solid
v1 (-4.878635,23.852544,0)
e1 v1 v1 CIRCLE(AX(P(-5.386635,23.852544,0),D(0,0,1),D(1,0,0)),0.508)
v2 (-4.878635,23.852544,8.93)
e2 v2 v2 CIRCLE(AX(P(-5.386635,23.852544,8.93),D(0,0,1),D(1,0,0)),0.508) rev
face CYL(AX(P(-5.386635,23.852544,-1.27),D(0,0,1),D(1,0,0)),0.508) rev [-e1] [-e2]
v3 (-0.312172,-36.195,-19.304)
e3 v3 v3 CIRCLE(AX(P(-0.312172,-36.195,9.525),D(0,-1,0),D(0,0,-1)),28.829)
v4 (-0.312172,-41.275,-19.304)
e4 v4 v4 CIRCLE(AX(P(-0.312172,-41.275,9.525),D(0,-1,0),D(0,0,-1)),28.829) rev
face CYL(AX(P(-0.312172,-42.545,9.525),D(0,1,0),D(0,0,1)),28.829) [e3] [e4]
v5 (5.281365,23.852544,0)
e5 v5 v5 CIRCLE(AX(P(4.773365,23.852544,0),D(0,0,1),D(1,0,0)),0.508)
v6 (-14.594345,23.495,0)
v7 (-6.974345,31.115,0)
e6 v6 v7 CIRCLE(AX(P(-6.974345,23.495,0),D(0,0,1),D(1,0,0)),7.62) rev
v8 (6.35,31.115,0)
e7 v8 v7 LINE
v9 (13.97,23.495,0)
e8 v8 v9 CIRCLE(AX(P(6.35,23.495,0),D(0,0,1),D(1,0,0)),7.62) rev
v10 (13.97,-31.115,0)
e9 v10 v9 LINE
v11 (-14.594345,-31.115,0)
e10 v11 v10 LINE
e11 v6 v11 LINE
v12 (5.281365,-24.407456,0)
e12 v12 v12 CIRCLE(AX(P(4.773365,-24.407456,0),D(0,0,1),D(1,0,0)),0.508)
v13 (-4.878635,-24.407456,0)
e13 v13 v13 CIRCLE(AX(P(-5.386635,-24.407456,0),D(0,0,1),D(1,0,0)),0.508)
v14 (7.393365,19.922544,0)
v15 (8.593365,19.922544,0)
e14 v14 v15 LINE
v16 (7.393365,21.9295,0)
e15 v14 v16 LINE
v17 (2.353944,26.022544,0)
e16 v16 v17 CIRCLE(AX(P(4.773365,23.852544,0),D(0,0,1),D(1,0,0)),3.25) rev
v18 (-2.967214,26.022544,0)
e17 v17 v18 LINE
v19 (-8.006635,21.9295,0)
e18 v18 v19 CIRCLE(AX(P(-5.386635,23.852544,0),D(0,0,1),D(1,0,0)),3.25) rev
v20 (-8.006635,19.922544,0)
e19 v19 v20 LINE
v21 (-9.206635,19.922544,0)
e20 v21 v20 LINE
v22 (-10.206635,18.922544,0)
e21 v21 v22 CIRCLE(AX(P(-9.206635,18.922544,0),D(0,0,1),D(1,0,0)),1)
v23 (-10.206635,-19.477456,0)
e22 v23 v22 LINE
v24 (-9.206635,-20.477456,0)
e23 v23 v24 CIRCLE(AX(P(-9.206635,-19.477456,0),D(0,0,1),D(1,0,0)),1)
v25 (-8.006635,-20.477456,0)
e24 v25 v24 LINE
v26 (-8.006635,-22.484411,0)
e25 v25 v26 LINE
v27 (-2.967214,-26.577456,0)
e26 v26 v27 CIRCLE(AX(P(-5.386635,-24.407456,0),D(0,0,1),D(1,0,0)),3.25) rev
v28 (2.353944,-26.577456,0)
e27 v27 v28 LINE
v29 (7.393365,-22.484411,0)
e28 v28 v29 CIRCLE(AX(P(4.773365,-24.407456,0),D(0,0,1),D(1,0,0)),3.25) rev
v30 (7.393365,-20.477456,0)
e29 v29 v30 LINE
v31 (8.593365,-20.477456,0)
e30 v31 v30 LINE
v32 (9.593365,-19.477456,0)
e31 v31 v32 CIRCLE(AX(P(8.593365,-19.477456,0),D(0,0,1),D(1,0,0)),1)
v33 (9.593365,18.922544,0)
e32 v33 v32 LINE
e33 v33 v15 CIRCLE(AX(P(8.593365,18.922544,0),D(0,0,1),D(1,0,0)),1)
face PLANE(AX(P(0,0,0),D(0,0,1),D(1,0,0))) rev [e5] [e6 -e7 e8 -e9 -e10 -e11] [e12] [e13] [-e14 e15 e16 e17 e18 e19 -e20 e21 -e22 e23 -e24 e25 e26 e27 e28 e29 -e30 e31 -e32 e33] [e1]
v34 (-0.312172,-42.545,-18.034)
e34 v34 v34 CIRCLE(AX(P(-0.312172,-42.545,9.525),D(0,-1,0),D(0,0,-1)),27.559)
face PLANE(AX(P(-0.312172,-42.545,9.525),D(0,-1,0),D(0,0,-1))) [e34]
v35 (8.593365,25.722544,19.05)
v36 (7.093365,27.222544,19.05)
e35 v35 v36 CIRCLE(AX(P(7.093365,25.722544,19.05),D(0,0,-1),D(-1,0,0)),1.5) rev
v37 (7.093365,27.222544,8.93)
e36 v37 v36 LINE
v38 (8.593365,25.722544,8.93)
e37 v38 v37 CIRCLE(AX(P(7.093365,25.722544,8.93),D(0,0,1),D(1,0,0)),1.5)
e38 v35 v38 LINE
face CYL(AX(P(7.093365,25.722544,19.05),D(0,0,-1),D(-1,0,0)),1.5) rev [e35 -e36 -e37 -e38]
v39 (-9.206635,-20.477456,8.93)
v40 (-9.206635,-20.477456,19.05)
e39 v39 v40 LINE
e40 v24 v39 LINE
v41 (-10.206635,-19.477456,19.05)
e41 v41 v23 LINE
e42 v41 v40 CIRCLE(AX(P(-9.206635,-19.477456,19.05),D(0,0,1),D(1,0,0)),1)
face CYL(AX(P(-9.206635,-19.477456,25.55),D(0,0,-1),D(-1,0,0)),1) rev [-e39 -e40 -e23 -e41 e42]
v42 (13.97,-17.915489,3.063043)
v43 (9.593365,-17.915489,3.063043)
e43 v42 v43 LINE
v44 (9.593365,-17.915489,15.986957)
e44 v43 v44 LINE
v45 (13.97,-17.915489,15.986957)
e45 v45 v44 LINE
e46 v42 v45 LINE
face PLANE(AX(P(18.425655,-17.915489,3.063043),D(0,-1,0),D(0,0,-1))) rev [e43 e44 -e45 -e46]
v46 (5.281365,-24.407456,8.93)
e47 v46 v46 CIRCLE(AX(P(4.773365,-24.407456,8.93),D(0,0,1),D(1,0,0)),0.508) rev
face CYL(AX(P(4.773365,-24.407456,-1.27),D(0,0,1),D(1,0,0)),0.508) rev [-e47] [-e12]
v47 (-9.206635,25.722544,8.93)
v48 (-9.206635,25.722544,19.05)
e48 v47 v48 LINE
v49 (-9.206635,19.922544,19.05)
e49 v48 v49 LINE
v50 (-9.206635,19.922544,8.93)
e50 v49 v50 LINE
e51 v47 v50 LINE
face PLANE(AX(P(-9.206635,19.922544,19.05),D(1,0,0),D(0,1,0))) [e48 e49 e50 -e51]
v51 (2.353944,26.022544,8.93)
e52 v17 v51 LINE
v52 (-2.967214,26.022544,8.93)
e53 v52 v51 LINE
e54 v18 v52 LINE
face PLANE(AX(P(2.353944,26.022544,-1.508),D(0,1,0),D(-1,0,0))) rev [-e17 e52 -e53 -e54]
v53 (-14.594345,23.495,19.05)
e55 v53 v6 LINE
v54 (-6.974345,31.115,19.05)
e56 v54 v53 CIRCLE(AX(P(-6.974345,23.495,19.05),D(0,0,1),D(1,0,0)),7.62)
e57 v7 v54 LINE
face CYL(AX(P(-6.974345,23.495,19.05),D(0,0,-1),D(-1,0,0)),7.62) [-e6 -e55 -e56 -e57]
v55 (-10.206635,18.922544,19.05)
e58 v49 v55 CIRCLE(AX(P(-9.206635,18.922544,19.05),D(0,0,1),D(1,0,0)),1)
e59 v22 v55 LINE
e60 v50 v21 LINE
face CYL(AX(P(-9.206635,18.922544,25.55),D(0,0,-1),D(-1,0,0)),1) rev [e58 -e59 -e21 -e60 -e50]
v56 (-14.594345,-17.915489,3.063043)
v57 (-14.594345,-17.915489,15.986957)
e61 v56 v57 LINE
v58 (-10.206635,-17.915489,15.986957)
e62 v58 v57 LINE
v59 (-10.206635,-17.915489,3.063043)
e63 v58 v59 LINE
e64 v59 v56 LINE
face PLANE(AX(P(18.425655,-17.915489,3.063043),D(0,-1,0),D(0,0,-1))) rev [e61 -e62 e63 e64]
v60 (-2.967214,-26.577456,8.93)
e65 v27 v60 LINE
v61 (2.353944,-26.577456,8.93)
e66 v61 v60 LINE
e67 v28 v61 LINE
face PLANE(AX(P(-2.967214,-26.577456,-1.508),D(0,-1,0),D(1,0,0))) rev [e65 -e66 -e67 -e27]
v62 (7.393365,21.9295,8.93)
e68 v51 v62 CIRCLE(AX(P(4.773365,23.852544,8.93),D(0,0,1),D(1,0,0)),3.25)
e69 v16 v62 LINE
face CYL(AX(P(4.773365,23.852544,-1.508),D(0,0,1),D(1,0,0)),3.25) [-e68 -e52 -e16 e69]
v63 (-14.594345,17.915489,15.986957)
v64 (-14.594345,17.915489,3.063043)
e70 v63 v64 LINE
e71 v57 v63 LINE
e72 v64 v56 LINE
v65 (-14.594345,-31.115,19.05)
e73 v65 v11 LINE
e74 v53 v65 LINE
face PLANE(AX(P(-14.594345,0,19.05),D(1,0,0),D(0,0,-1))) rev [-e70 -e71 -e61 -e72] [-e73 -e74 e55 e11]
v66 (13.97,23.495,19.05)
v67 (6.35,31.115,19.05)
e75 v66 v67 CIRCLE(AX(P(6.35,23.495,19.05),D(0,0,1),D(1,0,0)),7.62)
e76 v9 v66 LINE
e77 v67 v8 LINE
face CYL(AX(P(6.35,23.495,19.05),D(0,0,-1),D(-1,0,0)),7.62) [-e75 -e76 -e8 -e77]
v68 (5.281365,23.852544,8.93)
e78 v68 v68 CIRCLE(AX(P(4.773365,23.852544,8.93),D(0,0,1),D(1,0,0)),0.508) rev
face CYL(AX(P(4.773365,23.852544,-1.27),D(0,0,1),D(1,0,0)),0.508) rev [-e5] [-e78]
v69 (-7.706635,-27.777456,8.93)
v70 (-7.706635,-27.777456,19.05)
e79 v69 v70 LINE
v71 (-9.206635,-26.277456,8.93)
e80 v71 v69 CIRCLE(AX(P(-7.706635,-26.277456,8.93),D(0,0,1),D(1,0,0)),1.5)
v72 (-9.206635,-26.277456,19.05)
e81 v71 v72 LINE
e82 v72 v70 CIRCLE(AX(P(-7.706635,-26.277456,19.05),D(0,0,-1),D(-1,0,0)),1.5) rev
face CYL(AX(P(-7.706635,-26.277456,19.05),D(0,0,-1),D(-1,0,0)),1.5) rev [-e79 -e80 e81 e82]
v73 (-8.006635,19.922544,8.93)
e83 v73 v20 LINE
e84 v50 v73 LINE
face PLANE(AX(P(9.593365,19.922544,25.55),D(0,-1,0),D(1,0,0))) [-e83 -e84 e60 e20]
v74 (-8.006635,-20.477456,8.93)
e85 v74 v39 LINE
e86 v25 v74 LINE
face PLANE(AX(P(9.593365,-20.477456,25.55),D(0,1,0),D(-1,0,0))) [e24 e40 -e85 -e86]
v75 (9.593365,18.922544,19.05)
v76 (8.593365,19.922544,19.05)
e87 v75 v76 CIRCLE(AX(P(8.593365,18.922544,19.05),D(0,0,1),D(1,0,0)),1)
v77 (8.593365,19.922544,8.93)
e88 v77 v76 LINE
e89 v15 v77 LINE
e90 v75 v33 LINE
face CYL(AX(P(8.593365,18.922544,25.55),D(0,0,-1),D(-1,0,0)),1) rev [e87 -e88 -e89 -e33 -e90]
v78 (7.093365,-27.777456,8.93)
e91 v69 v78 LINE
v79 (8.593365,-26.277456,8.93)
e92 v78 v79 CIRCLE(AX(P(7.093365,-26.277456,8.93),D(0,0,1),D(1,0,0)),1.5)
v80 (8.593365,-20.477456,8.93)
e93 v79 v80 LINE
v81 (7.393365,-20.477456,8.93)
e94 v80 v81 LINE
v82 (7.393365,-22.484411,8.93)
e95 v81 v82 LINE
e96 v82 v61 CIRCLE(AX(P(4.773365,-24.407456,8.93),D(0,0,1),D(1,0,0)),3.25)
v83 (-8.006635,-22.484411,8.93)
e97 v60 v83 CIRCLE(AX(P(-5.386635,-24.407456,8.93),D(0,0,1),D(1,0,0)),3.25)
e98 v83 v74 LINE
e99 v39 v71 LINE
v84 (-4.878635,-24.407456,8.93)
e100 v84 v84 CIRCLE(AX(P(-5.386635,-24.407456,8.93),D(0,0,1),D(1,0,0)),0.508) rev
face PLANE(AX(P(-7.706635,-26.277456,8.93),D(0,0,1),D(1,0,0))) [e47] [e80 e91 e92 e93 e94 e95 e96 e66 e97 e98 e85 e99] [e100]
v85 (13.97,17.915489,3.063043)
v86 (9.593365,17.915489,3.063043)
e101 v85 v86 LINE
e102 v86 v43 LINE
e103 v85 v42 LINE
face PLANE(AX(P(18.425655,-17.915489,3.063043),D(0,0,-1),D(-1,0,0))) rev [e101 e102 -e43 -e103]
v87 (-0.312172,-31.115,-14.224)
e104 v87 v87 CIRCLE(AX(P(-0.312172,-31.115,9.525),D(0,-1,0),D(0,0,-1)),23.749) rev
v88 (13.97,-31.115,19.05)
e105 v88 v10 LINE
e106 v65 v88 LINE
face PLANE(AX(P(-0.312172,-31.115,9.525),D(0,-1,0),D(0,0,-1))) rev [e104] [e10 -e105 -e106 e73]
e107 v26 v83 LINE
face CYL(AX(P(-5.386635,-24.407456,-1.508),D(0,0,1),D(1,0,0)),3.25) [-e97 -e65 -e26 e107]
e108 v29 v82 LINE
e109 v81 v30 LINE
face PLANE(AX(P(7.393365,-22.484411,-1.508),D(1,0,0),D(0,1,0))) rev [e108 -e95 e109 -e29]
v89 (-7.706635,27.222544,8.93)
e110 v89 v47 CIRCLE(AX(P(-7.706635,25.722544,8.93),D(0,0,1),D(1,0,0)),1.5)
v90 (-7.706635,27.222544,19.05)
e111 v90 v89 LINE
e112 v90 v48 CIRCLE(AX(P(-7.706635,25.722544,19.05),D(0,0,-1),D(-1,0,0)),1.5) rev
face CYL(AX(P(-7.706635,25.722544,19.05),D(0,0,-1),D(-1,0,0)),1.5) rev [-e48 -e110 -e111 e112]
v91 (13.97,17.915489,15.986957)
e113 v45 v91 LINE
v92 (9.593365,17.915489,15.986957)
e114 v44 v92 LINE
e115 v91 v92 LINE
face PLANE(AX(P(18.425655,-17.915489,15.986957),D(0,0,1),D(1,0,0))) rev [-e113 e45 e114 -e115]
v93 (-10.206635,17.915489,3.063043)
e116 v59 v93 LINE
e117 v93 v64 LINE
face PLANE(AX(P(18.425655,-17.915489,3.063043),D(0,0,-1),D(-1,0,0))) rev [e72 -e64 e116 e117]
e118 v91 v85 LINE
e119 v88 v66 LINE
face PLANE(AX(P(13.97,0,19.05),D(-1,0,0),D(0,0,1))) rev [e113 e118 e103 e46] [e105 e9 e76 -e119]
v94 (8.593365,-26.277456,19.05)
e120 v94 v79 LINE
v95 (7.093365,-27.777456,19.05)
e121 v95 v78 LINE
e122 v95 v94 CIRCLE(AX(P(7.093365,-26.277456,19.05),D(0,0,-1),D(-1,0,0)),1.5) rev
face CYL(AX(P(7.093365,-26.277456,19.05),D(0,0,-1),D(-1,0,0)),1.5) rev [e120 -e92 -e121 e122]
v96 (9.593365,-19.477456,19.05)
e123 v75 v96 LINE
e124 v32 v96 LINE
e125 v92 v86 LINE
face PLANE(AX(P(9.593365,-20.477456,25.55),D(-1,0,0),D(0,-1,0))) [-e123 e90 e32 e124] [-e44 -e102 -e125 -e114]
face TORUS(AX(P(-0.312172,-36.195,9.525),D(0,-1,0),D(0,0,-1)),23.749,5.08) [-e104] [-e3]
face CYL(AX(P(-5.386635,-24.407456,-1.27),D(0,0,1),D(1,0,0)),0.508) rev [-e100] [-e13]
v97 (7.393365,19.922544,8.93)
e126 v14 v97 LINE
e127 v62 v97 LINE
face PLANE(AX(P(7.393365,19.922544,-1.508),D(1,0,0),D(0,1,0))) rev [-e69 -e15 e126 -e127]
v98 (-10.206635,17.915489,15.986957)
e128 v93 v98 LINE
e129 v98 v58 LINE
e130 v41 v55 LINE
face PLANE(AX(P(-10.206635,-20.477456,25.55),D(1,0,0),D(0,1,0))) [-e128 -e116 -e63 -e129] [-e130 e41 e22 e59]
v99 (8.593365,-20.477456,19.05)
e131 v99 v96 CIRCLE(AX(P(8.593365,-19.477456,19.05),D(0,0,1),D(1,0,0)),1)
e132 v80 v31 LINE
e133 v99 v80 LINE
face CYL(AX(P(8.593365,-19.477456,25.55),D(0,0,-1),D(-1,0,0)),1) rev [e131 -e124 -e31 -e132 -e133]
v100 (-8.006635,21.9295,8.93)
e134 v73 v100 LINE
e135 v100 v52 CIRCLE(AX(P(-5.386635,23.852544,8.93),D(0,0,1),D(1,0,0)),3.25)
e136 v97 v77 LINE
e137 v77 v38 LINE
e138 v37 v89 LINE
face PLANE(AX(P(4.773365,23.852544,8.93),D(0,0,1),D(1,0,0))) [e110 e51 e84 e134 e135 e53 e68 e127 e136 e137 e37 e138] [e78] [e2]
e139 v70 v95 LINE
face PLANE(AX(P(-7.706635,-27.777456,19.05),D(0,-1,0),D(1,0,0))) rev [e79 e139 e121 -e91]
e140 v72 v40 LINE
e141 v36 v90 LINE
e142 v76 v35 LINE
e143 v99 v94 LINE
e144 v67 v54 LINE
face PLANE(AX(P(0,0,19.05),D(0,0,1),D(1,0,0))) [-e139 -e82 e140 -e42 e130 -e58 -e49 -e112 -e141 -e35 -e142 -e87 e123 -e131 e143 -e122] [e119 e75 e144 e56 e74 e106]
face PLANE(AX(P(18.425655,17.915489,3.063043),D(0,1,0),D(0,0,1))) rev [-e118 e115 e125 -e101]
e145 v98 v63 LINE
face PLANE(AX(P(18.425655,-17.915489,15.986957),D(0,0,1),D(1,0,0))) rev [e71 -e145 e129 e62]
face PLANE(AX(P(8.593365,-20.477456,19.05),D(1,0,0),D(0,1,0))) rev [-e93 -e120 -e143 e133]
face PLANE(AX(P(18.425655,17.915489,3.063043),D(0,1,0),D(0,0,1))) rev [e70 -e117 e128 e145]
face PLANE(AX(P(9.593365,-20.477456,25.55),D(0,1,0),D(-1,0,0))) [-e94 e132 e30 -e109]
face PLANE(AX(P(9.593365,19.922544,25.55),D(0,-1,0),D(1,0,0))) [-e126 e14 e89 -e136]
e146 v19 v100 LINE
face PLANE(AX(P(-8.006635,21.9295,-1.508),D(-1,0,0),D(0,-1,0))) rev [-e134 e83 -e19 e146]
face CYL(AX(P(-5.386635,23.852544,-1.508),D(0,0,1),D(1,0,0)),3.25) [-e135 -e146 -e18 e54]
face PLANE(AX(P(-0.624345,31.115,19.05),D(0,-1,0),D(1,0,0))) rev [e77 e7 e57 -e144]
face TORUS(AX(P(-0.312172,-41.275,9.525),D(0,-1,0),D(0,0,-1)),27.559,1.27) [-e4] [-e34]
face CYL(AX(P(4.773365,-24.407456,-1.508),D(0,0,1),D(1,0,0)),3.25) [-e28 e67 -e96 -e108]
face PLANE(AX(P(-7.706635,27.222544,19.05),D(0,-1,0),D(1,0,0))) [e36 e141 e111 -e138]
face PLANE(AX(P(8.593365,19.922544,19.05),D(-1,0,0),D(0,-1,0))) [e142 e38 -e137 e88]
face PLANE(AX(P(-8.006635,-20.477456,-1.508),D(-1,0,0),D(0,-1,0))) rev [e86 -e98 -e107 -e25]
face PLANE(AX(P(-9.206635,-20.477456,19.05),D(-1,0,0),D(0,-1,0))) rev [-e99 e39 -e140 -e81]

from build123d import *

# Parameters (mm, degrees)
BOSS_EXTRUDE1_DEPTH   = 19.05
SKETCH2_R             = 28.829
BOSS_EXTRUDE3_DEPTH   = 11.43
FILLET1_R             = 7.62
FILLET2_R             = 5.08
FILLET3_R             = 1.27
CAVITY4_OUTLINE_R     = 0.5
CAVITY4_DEPTH         = 19.05
CAVITY4_START         = 16.55
CAVITY4_2_OUTLINE_R   = 2.25
CAVITY4_2_OUTLINE_R_2 = 0.5
CAVITY4_2_DEPTH       = 2.5
CAVITY4_START_2       = 18.05
CAVITY4_3_DEPTH       = 1
CAVITY4_START_3       = 5.35
CAVITY4_4_OUTLINE_R   = 0.5
CAVITY4_4_DEPTH       = 11.2
CUT_EXTRUDE2_DEPTH    = 25.4
CUT_EXTRUDE3_START    = -19.558
CUT_EXTRUDE3_DEPTH    = 19.558
SKETCH6_R             = 2.25
BOSS_EXTRUDE4_DEPTH   = 2.54
SKETCH7_W             = 12.923913796
SKETCH7_H             = 35.830978878
CUT_EXTRUDE4_DEPTH    = 33.02
CUT_EXTRUDE6_START    = -5.08
SKETCH8_R             = 2.25
CUT_EXTRUDE6_DEPTH    = 5.08
SKETCH9_R             = 0.508
CUT_EXTRUDE7_DEPTH    = 17.78
CUT_EXTRUDE8_START    = -7.62
CUT_EXTRUDE8_DEPTH    = 7.62


# Read off the part's stored shape, not the designer's step: Cavity4
with BuildPart() as part:
    # Sketch1 → Boss-Extrude1 (new body)
    with BuildSketch(Plane.XY):
        Polygon((0, -31.115), (13.97, -31.115), (13.97, 0), (13.97, 31.115), (-0.624344695, 31.115), (-14.594344695, 31.115), (-14.594344695, 0), (-14.594344695, -31.115), align=None)
    extrude(amount=BOSS_EXTRUDE1_DEPTH)

    # Sketch2 → Boss-Extrude3 (add)
    with BuildSketch(Plane.XZ.offset(31.115)):
        with Locations(Location((-0.312172348, 9.525, 0), (0, 0, 270))):
            Circle(SKETCH2_R)
    extrude(amount=BOSS_EXTRUDE3_DEPTH)

    # Fillet1
    fillet1_edges = [part.edges().sort_by_distance(p)[0] for p in [
        (-14.594344695, 31.115, 9.525),
        (13.97, 31.115, 9.525),
    ]]
    fillet(fillet1_edges, radius=FILLET1_R)

    # Fillet2
    fillet2_edges = [part.edges().sort_by_distance(p)[0] for p in [
        (-0.312172348, -31.115, 38.354),
    ]]
    fillet(fillet2_edges, radius=FILLET2_R)

    # Fillet3
    fillet3_edges = [part.edges().sort_by_distance(p)[0] for p in [
        (-0.312172348, -42.545, 38.354),
    ]]
    fillet(fillet3_edges, radius=FILLET3_R)

    # Cavity4 outline → Cavity4 (cut)
    with BuildSketch(Plane.XY):
        with BuildLine():
            Line((8.593365051, 19.922544312), (-9.206634949, 19.922544312))
            ThreePointArc((-9.206634949, 19.922544312), (-9.91374173, 19.629651093), (-10.206634949, 18.922544312))
            Line((-10.206634949, 18.922544312), (-10.206634949, -19.477455688))
            ThreePointArc((-10.206634949, -19.477455688), (-9.91374173, -20.184562469), (-9.206634949, -20.477455688))
            Line((-9.206634949, -20.477455688), (8.593365051, -20.477455688))
            ThreePointArc((8.593365051, -20.477455688), (9.300471832, -20.184562469), (9.593365051, -19.477455688))
            Line((9.593365051, -19.477455688), (9.593365051, 18.922544312))
            ThreePointArc((9.593365051, 18.922544312), (9.300471832, 19.629651094), (8.593365051, 19.922544312))
        make_face()
        with Locations((-9.206634949, -19.477455688)):
            Circle(CAVITY4_OUTLINE_R, mode=Mode.SUBTRACT)
        with Locations((8.593365051, -19.477455688)):
            Circle(CAVITY4_OUTLINE_R, mode=Mode.SUBTRACT)
        with Locations((-9.206634949, 18.922544312)):
            Circle(CAVITY4_OUTLINE_R, mode=Mode.SUBTRACT)
        with Locations((8.593365051, 18.922544312)):
            Circle(CAVITY4_OUTLINE_R, mode=Mode.SUBTRACT)
    extrude(amount=CAVITY4_DEPTH, mode=Mode.SUBTRACT)

    # Cavity4 2 outline → Cavity4 2 (cut)
    # profile 1 of 6: a face of its own
    with BuildSketch(Plane.XY.offset(CAVITY4_START)):
        with BuildLine():
            ThreePointArc((-8.006634949, 21.929499851), (-3.337656866, 21.329809919), (-2.96721353, 26.022544312))
            Line((-2.96721353, 26.022544312), (2.353943633, 26.022544312))
            ThreePointArc((2.353943633, 26.022544312), (2.724386969, 21.329809919), (7.393365051, 21.929499851))
            Line((7.393365051, 21.929499851), (7.393365051, 19.922544312))
            Line((7.393365051, 19.922544312), (8.593365051, 19.922544312))
            Line((8.593365051, 19.922544312), (8.593365051, 25.722544312))
            ThreePointArc((8.593365051, 25.722544312), (8.154025223, 26.783204484), (7.093365051, 27.222544312))
            Line((7.093365051, 27.222544312), (-7.706634949, 27.222544312))
            ThreePointArc((-7.706634949, 27.222544312), (-8.76729512, 26.783204484), (-9.206634949, 25.722544312))
            Line((-9.206634949, 25.722544312), (-9.206634949, 19.922544312))
            Line((-9.206634949, 19.922544312), (-8.006634949, 19.922544312))
            Line((-8.006634949, 19.922544312), (-8.006634949, 21.929499851))
        make_face()
        with Locations((-5.386634949, 23.852544312)):
            Circle(CAVITY4_2_OUTLINE_R, mode=Mode.SUBTRACT)
        with Locations((4.773365051, 23.852544312)):
            Circle(CAVITY4_2_OUTLINE_R, mode=Mode.SUBTRACT)
    # profile 2 of 6: a face of its own
    with BuildSketch(Plane.XY.offset(CAVITY4_START)):
        with BuildLine():
            Line((-8.006634949, -20.477455688), (-9.206634949, -20.477455688))
            Line((-9.206634949, -20.477455688), (-9.206634949, -26.277455688))
            ThreePointArc((-9.206634949, -26.277455688), (-8.76729512, -27.33811586), (-7.706634949, -27.777455688))
            Line((-7.706634949, -27.777455688), (7.093365051, -27.777455688))
            ThreePointArc((7.093365051, -27.777455688), (8.154025223, -27.33811586), (8.593365051, -26.277455688))
            Line((8.593365051, -26.277455688), (8.593365051, -20.477455688))
            Line((8.593365051, -20.477455688), (7.393365051, -20.477455688))
            Line((7.393365051, -20.477455688), (7.393365051, -22.484411227))
            ThreePointArc((7.393365051, -22.484411227), (2.724386969, -21.884721295), (2.353943633, -26.577455688))
            Line((2.353943633, -26.577455688), (-2.96721353, -26.577455688))
            ThreePointArc((-2.96721353, -26.577455688), (-3.337656866, -21.884721295), (-8.006634949, -22.484411227))
            Line((-8.006634949, -22.484411227), (-8.006634949, -20.477455688))
        make_face()
        with Locations((-5.386634949, -24.407455688)):
            Circle(CAVITY4_2_OUTLINE_R, mode=Mode.SUBTRACT)
        with Locations((4.773365051, -24.407455688)):
            Circle(CAVITY4_2_OUTLINE_R, mode=Mode.SUBTRACT)
    # profile 3 of 6: a face of its own
    with BuildSketch(Plane.XY.offset(CAVITY4_START)):
        with Locations((-9.206634949, -19.477455688)):
            Circle(CAVITY4_2_OUTLINE_R_2)
    # profile 4 of 6: a face of its own
    with BuildSketch(Plane.XY.offset(CAVITY4_START)):
        with Locations((-9.206634949, 18.922544312)):
            Circle(CAVITY4_2_OUTLINE_R_2)
    # profile 5 of 6: a face of its own
    with BuildSketch(Plane.XY.offset(CAVITY4_START)):
        with Locations((8.593365051, 18.922544312)):
            Circle(CAVITY4_2_OUTLINE_R_2)
    # profile 6 of 6: a face of its own
    with BuildSketch(Plane.XY.offset(CAVITY4_START)):
        with Locations((8.593365051, -19.477455688)):
            Circle(CAVITY4_2_OUTLINE_R_2)
    extrude(amount=CAVITY4_2_DEPTH, mode=Mode.SUBTRACT)

    # Cavity4 3 outline → Cavity4 3 (cut)
    with BuildSketch(Plane.XY.offset(CAVITY4_START_2)):
        with BuildLine():
            Line((2.353943633, 26.022544312), (-2.96721353, 26.022544312))
            ThreePointArc((-2.96721353, 26.022544312), (-3.337656866, 21.329809919), (-8.006634949, 21.929499851))
            Line((-8.006634949, 21.929499851), (-8.006634949, 19.922544312))
            Line((-8.006634949, 19.922544312), (7.393365051, 19.922544312))
            Line((7.393365051, 19.922544312), (7.393365051, 21.929499851))
            ThreePointArc((7.393365051, 21.929499851), (2.724386969, 21.329809919), (2.353943633, 26.022544312))
        make_face()
        with BuildLine():
            Line((7.393365051, -20.477455688), (-8.006634949, -20.477455688))
            Line((-8.006634949, -20.477455688), (-8.006634949, -22.484411227))
            ThreePointArc((-8.006634949, -22.484411227), (-3.337656866, -21.884721295), (-2.96721353, -26.577455688))
            Line((-2.96721353, -26.577455688), (2.353943633, -26.577455688))
            ThreePointArc((2.353943633, -26.577455688), (2.724386969, -21.884721295), (7.393365051, -22.484411227))
            Line((7.393365051, -22.484411227), (7.393365051, -20.477455688))
        make_face()
    extrude(amount=CAVITY4_3_DEPTH, mode=Mode.SUBTRACT)

    # Cavity4 4 outline → Cavity4 4 (cut)
    with BuildSketch(Plane.XY.offset(CAVITY4_START_3)):
        with Locations((-9.206634949, -19.477455688)):
            Circle(CAVITY4_4_OUTLINE_R)
        with Locations((-9.206634949, 18.922544312)):
            Circle(CAVITY4_4_OUTLINE_R)
        with Locations((8.593365051, 18.922544312)):
            Circle(CAVITY4_4_OUTLINE_R)
        with Locations((8.593365051, -19.477455688)):
            Circle(CAVITY4_4_OUTLINE_R)
    extrude(amount=CAVITY4_4_DEPTH, mode=Mode.SUBTRACT)

    # Sketch4 → Cut-Extrude2 (cut)
    with BuildSketch(Plane.XY.offset(19.05)):
        Polygon((-9.79576072, 19.507329281), (9.123068143, 19.507329281), (9.123068143, -20.023079802), (-9.743960735, -20.023079802), align=None)
    extrude(amount=-CUT_EXTRUDE2_DEPTH, mode=Mode.SUBTRACT)

    # Sketch5 → Cut-Extrude3 (cut)
    with BuildSketch(Plane.XY.offset(18.05).offset(CUT_EXTRUDE3_START)):
        with BuildLine():
            Line((7.393365051, -20.477455688), (-8.006634949, -20.477455688))
            Line((-8.006634949, -20.477455688), (-8.006634949, -22.484411227))
            ThreePointArc((-8.006634949, -22.484411227), (-3.337656866, -21.884721295), (-2.96721353, -26.577455688))
            Line((-2.96721353, -26.577455688), (2.353943633, -26.577455688))
            ThreePointArc((2.353943633, -26.577455688), (2.724386969, -21.884721295), (7.393365051, -22.484411227))
            Line((7.393365051, -22.484411227), (7.393365051, -20.477455688))
        make_face()
        with BuildLine():
            Line((2.353943633, 26.022544312), (-2.96721353, 26.022544312))
            ThreePointArc((-2.96721353, 26.022544312), (-3.337656866, 21.329809919), (-8.006634949, 21.929499851))
            Line((-8.006634949, 21.929499851), (-8.006634949, 19.922544312))
            Line((-8.006634949, 19.922544312), (7.393365051, 19.922544312))
            Line((7.393365051, 19.922544312), (7.393365051, 21.929499851))
            ThreePointArc((7.393365051, 21.929499851), (2.724386969, 21.329809919), (2.353943633, 26.022544312))
        make_face()
    extrude(amount=CUT_EXTRUDE3_DEPTH, mode=Mode.SUBTRACT)

    # Sketch6 → Boss-Extrude4 (add)
    with BuildSketch(Plane.XY.offset(19.05)):
        with Locations(Location((4.773365051, -24.407455688, 0), (0, 0, 180))):
            Circle(SKETCH6_R)
        with Locations(Location((-5.386634949, -24.407455688, 0), (0, 0, 180))):
            Circle(SKETCH6_R)
        with Locations(Location((4.773365051, 23.852544312, 0), (0, 0, 180))):
            Circle(SKETCH6_R)
        with Locations(Location((-5.386634949, 23.852544312, 0), (0, 0, 180))):
            Circle(SKETCH6_R)
    extrude(amount=BOSS_EXTRUDE4_DEPTH)

    # Sketch7 → Cut-Extrude4 (cut)
    with BuildSketch(Plane.ZY.offset(14.594344695)):
        with Locations((9.525, 0)):
            Rectangle(SKETCH7_W, SKETCH7_H)
    extrude(amount=-CUT_EXTRUDE4_DEPTH, mode=Mode.SUBTRACT)

    # Sketch8 → Cut-Extrude6 (cut)
    with BuildSketch(Plane.XY.offset(21.59).offset(CUT_EXTRUDE6_START)):
        with Locations((4.773365051, -24.407455688)):
            Circle(SKETCH8_R)
        with Locations((4.773365051, 23.852544312)):
            Circle(SKETCH8_R)
        with Locations((-5.386634949, 23.852544312)):
            Circle(SKETCH8_R)
        with Locations((-5.386634949, -24.407455688)):
            Circle(SKETCH8_R)
    extrude(amount=CUT_EXTRUDE6_DEPTH, mode=Mode.SUBTRACT)

    # Sketch9 → Cut-Extrude7 (cut)
    with BuildSketch(Plane.XY.offset(16.51)):
        with Locations((-5.386634949, 23.852544312)):
            Circle(SKETCH9_R)
        with Locations((4.773365051, 23.852544312)):
            Circle(SKETCH9_R)
        with Locations((4.773365051, -24.407455688)):
            Circle(SKETCH9_R)
        with Locations((-5.386634949, -24.407455688)):
            Circle(SKETCH9_R)
    extrude(amount=-CUT_EXTRUDE7_DEPTH, mode=Mode.SUBTRACT)

    # Sketch10 → Cut-Extrude8 (cut)
    with BuildSketch(Plane.XY.offset(16.55).offset(CUT_EXTRUDE8_START)):
        with BuildLine():
            Line((-7.706634949, -27.777455688), (7.093365051, -27.777455688))
            ThreePointArc((7.093365051, -27.777455688), (8.154025223, -27.33811586), (8.593365051, -26.277455688))
            Line((8.593365051, -26.277455688), (8.593365051, -20.477455688))
            Line((8.593365051, -20.477455688), (7.393365051, -20.477455688))
            Line((7.393365051, -20.477455688), (7.393365051, -22.484411227))
            ThreePointArc((7.393365051, -22.484411227), (2.724386969, -21.884721295), (2.353943633, -26.577455688))
            Line((2.353943633, -26.577455688), (-2.96721353, -26.577455688))
            ThreePointArc((-2.96721353, -26.577455688), (-3.337656866, -21.884721295), (-8.006634949, -22.484411227))
            Line((-8.006634949, -22.484411227), (-8.006634949, -20.477455688))
            Line((-8.006634949, -20.477455688), (-9.206634949, -20.477455688))
            Line((-9.206634949, -20.477455688), (-9.206634949, -26.277455688))
            ThreePointArc((-9.206634949, -26.277455688), (-8.76729512, -27.33811586), (-7.706634949, -27.777455688))
        make_face()
        with BuildLine():
            Line((7.393365051, 21.929499851), (7.393365051, 19.922544312))
            Line((7.393365051, 19.922544312), (8.593365051, 19.922544312))
            Line((8.593365051, 19.922544312), (8.593365051, 25.722544312))
            ThreePointArc((8.593365051, 25.722544312), (8.154025223, 26.783204484), (7.093365051, 27.222544312))
            Line((7.093365051, 27.222544312), (-7.706634949, 27.222544312))
            ThreePointArc((-7.706634949, 27.222544312), (-8.76729512, 26.783204484), (-9.206634949, 25.722544312))
            Line((-9.206634949, 25.722544312), (-9.206634949, 19.922544312))
            Line((-9.206634949, 19.922544312), (-8.006634949, 19.922544312))
            Line((-8.006634949, 19.922544312), (-8.006634949, 21.929499851))
            ThreePointArc((-8.006634949, 21.929499851), (-3.337656866, 21.329809919), (-2.96721353, 26.022544312))
            Line((-2.96721353, 26.022544312), (2.353943633, 26.022544312))
            ThreePointArc((2.353943633, 26.022544312), (2.724386969, 21.329809919), (7.393365051, 21.929499851))
        make_face()
    extrude(amount=CUT_EXTRUDE8_DEPTH, mode=Mode.SUBTRACT)


solid = part.part
